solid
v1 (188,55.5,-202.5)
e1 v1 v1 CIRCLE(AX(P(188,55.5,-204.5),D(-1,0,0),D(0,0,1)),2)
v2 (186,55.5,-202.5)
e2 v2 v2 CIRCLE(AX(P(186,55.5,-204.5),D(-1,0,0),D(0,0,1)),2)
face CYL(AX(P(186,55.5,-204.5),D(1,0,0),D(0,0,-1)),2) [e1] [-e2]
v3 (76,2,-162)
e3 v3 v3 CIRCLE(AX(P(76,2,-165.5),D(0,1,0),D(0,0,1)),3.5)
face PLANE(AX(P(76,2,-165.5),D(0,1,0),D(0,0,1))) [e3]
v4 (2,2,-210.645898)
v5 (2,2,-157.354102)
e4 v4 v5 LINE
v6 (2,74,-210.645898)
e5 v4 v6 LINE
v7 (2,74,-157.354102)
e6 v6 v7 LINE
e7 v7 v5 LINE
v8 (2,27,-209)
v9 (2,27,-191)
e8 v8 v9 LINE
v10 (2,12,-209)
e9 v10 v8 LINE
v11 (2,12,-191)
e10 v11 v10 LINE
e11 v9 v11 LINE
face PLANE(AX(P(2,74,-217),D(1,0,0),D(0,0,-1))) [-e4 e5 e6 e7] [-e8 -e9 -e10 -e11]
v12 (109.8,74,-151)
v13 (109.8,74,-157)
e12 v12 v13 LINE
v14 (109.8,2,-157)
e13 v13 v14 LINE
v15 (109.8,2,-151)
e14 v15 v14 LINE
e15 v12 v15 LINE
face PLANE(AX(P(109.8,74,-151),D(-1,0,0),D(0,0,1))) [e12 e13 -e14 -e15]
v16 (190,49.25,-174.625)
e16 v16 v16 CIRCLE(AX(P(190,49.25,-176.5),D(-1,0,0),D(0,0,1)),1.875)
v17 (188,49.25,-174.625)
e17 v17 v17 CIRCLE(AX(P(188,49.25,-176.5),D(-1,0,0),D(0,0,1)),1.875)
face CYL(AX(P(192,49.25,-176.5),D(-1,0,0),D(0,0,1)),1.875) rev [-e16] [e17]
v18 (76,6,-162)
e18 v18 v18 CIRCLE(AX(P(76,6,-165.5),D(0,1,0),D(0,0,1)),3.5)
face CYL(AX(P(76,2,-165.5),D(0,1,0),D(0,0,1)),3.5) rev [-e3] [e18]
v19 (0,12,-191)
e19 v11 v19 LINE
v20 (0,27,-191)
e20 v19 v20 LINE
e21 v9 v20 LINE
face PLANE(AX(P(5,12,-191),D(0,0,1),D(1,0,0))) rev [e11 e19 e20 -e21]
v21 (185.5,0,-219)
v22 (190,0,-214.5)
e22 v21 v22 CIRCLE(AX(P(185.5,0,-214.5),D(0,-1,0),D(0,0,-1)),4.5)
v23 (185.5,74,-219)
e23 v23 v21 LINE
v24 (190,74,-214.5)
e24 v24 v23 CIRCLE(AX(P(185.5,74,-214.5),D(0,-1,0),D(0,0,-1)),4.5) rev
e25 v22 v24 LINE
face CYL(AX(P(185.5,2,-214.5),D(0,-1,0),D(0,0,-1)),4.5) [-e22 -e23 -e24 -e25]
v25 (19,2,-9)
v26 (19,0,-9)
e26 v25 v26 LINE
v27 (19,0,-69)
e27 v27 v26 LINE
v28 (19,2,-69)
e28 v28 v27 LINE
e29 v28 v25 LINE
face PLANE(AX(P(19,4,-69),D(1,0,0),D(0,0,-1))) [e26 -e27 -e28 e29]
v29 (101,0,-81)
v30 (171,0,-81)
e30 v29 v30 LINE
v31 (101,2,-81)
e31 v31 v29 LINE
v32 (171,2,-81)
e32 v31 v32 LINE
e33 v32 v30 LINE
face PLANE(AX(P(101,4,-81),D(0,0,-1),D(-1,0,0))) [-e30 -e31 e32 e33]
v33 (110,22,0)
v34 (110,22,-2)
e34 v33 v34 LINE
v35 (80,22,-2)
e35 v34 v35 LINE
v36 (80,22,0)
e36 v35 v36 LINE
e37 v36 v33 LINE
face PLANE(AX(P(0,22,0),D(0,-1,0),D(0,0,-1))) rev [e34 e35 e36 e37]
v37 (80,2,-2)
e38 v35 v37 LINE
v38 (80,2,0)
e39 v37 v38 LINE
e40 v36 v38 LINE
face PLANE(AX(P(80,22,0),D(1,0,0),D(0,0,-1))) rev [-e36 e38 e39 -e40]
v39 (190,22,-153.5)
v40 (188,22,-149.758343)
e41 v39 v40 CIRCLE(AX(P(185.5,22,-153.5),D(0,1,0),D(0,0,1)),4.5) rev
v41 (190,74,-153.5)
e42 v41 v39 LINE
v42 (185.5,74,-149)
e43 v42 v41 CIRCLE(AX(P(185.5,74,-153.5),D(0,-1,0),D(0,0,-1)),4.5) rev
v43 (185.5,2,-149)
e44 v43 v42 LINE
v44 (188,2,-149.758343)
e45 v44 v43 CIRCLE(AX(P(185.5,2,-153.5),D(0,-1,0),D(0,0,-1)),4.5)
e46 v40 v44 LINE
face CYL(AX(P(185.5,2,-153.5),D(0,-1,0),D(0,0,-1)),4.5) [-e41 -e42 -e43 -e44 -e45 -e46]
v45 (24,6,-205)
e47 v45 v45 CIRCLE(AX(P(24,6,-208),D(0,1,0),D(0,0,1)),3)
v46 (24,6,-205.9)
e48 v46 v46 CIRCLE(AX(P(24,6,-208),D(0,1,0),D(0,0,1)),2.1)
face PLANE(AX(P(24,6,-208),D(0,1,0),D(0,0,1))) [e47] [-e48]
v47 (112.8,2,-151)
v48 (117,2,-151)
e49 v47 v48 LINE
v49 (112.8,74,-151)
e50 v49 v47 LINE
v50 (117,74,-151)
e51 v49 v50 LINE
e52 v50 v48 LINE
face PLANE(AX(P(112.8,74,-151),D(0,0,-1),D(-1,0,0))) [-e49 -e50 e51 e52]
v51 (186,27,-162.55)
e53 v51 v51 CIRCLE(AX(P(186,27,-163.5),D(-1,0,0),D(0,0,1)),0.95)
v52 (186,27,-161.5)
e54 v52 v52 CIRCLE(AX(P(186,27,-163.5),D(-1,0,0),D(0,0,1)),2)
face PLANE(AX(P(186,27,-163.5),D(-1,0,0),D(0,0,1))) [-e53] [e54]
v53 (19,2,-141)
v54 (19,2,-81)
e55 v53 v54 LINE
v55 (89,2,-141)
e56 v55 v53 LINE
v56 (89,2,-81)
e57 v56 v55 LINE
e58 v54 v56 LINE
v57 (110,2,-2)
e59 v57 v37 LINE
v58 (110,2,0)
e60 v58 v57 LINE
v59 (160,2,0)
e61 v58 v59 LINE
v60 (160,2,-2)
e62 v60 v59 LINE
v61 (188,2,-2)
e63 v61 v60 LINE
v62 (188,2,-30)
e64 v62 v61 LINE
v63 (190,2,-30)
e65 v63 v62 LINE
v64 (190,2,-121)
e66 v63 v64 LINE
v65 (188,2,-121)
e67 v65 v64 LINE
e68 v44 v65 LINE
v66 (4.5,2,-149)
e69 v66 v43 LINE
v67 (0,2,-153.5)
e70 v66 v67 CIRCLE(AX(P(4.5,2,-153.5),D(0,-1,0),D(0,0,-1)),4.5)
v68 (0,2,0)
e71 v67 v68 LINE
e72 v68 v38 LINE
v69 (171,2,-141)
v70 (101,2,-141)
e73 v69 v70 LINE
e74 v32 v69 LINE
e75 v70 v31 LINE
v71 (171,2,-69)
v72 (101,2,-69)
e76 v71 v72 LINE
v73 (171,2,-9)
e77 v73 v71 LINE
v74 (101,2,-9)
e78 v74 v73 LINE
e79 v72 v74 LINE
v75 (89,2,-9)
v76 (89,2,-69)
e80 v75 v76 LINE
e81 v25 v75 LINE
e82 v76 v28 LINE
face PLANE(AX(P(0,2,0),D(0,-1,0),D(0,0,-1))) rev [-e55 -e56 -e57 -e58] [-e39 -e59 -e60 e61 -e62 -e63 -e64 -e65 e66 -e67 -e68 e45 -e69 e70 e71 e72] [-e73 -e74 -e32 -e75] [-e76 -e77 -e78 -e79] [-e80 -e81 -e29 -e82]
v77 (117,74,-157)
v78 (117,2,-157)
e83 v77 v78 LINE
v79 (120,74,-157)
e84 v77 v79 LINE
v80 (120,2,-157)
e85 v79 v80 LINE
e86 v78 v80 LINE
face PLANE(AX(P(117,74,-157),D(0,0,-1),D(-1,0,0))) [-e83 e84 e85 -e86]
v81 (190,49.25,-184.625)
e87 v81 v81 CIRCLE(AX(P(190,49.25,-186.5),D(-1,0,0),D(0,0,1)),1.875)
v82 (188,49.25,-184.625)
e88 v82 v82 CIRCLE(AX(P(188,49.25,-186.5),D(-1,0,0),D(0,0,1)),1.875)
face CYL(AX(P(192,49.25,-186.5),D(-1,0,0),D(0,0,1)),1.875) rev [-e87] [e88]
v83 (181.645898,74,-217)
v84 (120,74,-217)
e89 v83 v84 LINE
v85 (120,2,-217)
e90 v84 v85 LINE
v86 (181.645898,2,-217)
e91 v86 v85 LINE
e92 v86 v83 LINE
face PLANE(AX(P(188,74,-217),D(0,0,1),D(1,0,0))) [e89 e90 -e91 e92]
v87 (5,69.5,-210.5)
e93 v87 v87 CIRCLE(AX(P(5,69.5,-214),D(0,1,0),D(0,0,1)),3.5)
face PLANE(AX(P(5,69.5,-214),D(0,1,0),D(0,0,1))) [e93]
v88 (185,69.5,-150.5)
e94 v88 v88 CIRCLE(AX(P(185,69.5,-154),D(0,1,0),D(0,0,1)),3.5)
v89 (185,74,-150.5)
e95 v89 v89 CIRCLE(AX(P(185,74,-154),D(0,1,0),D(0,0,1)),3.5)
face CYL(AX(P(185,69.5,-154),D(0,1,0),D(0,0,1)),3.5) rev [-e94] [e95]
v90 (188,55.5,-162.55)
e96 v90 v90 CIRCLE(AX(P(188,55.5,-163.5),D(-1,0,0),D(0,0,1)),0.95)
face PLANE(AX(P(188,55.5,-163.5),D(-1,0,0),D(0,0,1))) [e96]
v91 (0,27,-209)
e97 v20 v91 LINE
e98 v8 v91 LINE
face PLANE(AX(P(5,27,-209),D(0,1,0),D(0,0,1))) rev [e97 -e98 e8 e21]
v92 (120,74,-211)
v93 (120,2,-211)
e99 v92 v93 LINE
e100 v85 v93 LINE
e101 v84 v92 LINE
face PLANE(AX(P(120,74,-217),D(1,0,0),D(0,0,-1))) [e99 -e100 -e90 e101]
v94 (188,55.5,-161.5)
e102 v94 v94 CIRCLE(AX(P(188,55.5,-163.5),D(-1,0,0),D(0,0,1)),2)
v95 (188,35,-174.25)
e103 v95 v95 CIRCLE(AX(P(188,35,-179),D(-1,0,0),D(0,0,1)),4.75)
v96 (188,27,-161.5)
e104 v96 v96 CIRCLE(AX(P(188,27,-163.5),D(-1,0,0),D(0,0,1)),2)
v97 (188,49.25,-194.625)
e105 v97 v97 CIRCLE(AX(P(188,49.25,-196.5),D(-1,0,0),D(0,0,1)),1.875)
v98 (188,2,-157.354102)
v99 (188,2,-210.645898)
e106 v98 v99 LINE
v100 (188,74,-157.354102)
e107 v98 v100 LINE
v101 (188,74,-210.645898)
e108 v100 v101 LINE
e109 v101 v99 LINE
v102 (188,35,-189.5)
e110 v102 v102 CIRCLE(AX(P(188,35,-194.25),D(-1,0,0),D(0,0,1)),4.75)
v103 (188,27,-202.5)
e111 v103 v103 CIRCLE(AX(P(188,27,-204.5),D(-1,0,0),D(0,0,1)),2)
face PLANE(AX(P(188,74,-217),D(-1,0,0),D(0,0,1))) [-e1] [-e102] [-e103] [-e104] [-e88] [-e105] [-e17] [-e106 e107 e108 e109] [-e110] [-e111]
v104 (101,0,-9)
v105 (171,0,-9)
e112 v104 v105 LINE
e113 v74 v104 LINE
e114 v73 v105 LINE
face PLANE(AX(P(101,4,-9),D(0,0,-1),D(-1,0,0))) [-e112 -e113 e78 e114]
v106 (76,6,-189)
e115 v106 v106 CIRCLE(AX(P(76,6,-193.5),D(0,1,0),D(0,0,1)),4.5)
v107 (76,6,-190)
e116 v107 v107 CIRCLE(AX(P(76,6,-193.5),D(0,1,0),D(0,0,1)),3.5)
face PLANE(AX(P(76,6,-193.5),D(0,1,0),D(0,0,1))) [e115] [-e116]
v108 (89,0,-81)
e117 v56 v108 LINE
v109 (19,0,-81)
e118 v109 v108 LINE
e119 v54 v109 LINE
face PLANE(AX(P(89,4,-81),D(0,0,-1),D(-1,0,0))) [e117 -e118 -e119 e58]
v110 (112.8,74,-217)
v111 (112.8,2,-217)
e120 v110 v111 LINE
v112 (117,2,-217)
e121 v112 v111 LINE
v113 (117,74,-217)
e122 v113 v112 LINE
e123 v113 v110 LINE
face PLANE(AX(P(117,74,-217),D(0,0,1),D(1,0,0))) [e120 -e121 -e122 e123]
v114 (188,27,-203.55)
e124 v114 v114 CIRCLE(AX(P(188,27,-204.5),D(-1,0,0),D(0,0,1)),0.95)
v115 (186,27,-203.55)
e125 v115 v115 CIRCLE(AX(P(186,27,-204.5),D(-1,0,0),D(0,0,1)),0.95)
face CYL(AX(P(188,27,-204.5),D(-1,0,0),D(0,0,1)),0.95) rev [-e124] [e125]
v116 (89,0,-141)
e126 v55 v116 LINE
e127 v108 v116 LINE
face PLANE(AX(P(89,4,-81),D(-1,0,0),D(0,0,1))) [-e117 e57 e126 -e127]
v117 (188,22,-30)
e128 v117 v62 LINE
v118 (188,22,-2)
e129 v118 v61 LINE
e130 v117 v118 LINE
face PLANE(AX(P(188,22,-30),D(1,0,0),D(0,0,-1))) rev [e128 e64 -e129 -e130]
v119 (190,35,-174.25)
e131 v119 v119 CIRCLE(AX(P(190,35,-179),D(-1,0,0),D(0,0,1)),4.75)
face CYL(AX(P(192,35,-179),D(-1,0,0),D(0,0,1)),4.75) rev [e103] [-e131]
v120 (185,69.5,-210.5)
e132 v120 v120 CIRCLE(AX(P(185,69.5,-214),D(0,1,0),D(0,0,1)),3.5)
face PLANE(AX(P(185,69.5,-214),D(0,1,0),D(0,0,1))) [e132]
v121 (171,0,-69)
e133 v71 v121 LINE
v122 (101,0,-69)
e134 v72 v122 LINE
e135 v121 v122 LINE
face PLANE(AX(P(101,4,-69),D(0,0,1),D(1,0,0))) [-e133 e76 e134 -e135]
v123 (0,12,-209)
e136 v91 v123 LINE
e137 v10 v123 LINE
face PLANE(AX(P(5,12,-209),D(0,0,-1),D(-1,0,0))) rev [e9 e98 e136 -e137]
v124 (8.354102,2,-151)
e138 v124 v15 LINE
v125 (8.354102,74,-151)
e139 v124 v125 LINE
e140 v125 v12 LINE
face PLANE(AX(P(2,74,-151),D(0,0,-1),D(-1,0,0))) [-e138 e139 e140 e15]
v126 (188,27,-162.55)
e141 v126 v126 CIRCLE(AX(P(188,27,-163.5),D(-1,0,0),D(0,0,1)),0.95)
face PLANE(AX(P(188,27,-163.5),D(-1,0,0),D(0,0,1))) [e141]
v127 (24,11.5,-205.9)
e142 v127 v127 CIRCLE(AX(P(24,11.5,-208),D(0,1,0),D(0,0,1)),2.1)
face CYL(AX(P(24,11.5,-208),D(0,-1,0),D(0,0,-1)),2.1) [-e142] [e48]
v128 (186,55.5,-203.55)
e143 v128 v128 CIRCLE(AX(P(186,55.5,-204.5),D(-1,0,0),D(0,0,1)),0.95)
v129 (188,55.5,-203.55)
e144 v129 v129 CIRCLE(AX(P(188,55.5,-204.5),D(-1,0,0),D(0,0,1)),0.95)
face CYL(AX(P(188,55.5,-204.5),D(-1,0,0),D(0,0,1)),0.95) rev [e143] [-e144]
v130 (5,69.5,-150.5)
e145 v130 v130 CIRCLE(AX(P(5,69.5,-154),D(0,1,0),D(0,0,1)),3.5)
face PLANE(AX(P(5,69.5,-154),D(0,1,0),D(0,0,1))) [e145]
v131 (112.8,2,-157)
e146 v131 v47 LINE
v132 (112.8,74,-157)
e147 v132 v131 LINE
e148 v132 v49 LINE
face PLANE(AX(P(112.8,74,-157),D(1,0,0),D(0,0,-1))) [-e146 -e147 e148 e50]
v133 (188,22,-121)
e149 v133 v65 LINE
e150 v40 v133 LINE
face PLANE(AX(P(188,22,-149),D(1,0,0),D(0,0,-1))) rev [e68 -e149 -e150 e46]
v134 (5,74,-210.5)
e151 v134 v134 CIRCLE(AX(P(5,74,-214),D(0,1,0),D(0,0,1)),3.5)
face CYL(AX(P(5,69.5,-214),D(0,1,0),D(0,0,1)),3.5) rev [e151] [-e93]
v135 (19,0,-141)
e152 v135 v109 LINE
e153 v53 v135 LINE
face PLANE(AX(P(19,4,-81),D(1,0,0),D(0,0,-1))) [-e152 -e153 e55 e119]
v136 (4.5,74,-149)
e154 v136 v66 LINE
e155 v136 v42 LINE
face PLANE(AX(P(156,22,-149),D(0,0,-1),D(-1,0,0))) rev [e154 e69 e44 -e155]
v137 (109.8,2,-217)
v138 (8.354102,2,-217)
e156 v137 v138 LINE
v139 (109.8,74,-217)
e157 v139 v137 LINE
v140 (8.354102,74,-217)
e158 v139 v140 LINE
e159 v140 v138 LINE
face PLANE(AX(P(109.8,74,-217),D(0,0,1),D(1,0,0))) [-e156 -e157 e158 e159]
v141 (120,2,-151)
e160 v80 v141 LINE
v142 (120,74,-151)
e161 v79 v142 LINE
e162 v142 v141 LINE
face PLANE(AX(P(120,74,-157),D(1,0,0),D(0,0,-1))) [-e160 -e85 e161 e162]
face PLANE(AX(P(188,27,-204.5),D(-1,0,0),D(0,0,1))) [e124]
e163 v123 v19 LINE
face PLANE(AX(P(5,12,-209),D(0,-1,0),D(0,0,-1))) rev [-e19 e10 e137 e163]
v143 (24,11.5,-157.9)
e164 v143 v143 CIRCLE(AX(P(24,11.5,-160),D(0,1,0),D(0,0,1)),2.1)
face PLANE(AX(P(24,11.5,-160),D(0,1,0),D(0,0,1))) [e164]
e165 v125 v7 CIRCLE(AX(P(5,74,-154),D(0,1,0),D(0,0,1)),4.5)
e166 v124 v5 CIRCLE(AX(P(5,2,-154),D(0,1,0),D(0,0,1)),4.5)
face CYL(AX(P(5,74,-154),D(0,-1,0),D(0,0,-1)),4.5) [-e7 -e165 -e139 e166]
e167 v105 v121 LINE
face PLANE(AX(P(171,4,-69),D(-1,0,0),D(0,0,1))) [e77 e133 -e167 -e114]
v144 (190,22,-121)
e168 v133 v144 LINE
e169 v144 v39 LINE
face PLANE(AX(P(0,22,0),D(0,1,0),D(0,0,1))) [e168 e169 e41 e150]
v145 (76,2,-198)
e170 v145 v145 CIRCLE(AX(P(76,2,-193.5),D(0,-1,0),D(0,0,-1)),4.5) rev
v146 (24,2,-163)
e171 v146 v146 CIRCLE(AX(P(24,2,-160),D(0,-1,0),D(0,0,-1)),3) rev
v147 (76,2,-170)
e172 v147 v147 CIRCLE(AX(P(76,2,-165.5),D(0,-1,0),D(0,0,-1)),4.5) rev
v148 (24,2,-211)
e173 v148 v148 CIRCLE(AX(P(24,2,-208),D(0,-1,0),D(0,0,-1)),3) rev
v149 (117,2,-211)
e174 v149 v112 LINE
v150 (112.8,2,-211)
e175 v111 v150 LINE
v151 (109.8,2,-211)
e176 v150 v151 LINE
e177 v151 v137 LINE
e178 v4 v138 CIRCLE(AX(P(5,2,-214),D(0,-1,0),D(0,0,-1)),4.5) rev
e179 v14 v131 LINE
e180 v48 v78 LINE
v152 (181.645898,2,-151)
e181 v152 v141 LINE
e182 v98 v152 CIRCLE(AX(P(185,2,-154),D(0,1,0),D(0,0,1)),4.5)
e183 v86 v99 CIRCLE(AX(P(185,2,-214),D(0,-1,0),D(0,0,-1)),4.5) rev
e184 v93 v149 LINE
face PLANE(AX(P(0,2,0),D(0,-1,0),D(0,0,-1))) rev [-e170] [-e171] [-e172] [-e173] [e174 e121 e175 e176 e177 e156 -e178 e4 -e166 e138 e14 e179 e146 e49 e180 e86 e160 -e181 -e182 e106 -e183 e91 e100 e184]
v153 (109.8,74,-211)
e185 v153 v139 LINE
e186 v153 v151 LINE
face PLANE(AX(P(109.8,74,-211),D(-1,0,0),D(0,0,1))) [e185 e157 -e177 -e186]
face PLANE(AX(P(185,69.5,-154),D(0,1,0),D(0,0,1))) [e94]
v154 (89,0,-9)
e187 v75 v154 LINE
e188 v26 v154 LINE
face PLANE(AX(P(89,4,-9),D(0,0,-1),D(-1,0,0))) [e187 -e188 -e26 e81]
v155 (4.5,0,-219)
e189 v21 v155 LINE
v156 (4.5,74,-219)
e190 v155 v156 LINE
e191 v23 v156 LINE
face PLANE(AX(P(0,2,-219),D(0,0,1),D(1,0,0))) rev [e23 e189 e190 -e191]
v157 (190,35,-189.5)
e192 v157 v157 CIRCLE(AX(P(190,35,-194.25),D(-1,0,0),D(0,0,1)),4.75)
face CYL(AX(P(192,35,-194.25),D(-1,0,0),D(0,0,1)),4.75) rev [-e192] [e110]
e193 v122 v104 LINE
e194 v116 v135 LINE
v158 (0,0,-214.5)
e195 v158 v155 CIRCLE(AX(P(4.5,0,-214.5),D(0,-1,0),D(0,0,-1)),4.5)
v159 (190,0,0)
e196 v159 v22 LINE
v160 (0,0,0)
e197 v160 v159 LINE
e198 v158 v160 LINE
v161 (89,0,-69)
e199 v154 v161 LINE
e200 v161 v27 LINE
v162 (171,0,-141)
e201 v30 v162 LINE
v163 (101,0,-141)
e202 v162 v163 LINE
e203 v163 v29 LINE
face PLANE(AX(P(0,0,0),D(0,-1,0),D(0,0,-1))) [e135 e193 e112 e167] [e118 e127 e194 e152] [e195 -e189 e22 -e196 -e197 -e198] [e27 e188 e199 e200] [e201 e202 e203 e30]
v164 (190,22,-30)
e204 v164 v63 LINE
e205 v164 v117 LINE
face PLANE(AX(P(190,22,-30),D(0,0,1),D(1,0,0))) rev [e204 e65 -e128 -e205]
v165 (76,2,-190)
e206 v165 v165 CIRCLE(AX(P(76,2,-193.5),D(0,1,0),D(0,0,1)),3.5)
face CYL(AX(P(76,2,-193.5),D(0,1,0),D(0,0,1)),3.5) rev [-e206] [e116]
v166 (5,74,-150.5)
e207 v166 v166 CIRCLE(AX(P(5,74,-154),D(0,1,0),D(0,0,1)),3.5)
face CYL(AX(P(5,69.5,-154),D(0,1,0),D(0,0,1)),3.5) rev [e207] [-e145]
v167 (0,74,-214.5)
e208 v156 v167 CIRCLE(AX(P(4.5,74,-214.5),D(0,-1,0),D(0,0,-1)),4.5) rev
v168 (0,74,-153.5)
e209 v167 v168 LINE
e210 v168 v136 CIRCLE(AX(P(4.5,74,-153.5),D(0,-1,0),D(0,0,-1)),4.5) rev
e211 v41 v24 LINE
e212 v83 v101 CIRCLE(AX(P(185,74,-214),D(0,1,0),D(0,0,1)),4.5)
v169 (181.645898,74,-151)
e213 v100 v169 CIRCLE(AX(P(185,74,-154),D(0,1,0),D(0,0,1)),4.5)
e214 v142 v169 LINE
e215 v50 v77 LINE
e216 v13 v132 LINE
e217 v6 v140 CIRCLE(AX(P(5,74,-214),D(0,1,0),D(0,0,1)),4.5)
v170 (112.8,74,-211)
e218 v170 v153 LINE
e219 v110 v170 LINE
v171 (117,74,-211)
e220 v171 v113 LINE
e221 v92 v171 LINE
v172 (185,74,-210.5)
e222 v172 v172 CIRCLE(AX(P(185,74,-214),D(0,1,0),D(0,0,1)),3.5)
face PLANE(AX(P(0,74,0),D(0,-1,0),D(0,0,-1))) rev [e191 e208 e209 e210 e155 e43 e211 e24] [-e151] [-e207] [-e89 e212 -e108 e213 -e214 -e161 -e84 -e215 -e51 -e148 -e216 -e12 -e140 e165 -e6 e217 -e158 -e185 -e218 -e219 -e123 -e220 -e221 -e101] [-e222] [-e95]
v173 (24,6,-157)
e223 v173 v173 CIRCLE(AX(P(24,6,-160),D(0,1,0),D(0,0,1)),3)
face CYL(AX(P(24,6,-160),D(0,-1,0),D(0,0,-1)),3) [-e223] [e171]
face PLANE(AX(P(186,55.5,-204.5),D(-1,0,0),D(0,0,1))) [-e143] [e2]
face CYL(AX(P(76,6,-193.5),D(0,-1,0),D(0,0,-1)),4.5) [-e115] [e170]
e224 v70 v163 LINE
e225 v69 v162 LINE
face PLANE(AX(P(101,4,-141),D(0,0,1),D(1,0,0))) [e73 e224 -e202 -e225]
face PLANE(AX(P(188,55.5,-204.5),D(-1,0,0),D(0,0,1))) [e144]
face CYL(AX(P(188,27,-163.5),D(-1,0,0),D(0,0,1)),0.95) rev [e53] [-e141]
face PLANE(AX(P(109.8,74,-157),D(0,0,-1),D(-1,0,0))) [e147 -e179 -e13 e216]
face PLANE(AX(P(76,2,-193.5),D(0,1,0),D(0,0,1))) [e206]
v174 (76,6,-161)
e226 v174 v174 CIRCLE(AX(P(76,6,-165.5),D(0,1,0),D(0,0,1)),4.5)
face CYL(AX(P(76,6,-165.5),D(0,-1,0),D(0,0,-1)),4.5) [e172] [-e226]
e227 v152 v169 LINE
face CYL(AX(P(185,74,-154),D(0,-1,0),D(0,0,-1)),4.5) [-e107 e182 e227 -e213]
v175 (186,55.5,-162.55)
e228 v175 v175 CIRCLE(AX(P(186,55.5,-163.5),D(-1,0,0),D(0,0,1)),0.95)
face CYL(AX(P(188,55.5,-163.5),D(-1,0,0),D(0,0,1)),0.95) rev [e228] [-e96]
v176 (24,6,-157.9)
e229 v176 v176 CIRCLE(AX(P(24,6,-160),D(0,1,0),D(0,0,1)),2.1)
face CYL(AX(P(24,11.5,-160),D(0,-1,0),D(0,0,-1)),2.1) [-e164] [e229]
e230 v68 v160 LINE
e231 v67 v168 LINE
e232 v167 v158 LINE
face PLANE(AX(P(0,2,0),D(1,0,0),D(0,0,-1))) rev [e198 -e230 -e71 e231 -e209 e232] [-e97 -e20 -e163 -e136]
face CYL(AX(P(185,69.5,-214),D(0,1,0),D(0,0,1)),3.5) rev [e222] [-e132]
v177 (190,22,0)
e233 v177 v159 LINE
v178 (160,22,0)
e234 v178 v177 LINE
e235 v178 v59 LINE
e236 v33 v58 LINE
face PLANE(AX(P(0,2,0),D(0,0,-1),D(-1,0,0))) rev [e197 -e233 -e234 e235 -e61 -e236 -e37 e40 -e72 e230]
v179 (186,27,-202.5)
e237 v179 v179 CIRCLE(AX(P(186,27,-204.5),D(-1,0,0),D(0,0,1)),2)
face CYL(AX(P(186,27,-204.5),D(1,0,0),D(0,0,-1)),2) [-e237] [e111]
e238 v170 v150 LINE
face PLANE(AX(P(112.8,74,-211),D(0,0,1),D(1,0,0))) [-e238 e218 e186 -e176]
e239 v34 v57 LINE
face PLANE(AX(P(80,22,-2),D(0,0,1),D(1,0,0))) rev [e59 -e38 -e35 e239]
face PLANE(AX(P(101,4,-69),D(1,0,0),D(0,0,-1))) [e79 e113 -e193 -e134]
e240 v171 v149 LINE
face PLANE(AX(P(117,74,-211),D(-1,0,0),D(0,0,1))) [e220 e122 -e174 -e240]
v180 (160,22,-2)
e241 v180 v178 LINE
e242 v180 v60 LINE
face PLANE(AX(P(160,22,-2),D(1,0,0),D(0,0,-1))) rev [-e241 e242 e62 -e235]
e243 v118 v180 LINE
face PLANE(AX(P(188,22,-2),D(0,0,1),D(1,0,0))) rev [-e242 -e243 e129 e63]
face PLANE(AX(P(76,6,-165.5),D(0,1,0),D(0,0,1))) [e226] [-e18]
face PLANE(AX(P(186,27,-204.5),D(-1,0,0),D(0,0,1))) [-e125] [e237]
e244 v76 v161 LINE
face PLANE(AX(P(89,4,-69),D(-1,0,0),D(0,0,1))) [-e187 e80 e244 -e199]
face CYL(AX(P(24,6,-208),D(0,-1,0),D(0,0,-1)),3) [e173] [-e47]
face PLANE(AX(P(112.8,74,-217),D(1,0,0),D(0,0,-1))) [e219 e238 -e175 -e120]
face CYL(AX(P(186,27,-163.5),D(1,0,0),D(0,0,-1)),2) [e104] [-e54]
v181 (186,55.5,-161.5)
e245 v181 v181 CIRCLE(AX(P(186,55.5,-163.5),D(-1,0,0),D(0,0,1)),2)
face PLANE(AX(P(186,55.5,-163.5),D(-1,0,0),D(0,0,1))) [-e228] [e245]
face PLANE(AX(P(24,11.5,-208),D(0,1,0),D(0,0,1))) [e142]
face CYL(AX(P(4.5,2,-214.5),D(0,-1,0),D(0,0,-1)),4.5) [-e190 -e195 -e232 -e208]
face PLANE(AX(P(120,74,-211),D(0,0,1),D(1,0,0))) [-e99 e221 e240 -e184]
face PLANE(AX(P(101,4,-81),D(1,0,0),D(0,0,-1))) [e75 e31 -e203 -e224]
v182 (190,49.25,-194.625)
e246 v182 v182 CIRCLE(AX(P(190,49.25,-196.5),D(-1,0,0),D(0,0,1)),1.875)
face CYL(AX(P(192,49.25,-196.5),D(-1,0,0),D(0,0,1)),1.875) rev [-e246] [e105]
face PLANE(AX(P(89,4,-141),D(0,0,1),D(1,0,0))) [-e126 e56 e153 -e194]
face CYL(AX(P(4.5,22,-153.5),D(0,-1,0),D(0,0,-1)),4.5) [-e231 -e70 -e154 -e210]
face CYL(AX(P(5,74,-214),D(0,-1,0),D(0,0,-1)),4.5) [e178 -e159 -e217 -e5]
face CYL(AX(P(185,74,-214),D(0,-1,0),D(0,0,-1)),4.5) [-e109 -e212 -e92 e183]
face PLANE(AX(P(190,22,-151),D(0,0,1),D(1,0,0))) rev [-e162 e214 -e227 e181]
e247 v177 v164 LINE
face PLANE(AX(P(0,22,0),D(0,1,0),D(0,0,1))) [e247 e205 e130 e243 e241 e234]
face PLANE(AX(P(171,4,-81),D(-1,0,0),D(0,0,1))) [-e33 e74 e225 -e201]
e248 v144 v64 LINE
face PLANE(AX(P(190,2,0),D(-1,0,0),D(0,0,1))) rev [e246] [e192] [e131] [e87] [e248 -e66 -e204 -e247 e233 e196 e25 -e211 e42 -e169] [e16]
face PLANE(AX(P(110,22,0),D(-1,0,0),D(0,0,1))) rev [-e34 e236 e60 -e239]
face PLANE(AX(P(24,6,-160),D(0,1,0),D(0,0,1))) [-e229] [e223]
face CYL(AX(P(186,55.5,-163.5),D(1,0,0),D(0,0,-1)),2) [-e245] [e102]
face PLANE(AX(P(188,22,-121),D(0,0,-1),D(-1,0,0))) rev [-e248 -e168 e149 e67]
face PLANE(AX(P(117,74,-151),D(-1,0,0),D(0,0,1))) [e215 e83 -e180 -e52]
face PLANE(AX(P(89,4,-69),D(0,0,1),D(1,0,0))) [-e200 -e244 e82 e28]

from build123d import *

# Parameters (mm, degrees)
SKETCH1_W           = 190
SKETCH1_H           = 219
BOSS_EXTRUDE1_DEPTH = 2
SKETCH4_W           = 70
SKETCH4_H           = 60
CUT_EXTRUDE1_DEPTH  = 4
SKETCH2_W           = 30
SKETCH2_H           = 2
BOSS_EXTRUDE2_DEPTH = 20
SKETCH3_W           = 190
SKETCH3_H           = 70
BOSS_EXTRUDE3_DEPTH = 72
SKETCH7_R           = 3
SKETCH7_R_2         = 4.5
BOSS_EXTRUDE4_DEPTH = 4
SKETCH8_R           = 3.5
CUT_EXTRUDE3_DEPTH  = 4
SKETCH9_R           = 2
BOSS_EXTRUDE5_DEPTH = 2
SKETCH10_R          = 0.95
CUT_EXTRUDE4_DEPTH  = 2
SKETCH11_R          = 1.875
SKETCH11_R_2        = 4.75
CUT_EXTRUDE5_DEPTH  = 4
SKETCH12_R          = 4.5
BOSS_EXTRUDE6_DEPTH = 72
SKETCH13_R          = 3.5
CUT_EXTRUDE6_DEPTH  = 4.5
FILLET1_START       = 2
FILLET1_DEPTH       = 73
FILLET1_START_2     = 22
FILLET1_2_DEPTH     = 53
FILLET1_START_3     = -1
FILLET1_3_DEPTH     = 23
SKETCH14_W          = 18
SKETCH14_H          = 15
CUT_EXTRUDE7_DEPTH  = 5
SKETCH15_R          = 2.1
BOSS_EXTRUDE7_DEPTH = 5.5


with BuildPart() as part:
    # Sketch1 → Boss-Extrude1 (new body)
    with BuildSketch(Plane(origin=(0, 0, 0), x_dir=(1, 0, 0), z_dir=(0, 1, 0))):
        with Locations((95, 109.5)):
            Rectangle(SKETCH1_W, SKETCH1_H)
    extrude(amount=BOSS_EXTRUDE1_DEPTH)

    # Sketch4 → Cut-Extrude1 (cut)
    with BuildSketch(Plane(origin=(0, 0, 0), x_dir=(1, 0, 0), z_dir=(0, 1, 0))):
        with Locations((54, 111)):
            Rectangle(SKETCH4_W, SKETCH4_H)
        with Locations((136, 111)):
            Rectangle(SKETCH4_W, SKETCH4_H)
        with Locations((136, 39)):
            Rectangle(SKETCH4_W, SKETCH4_H)
        with Locations((54, 39)):
            Rectangle(SKETCH4_W, SKETCH4_H)
    extrude(amount=CUT_EXTRUDE1_DEPTH, mode=Mode.SUBTRACT)

    # Sketch2 → Boss-Extrude2 (add)
    with BuildSketch(Plane(origin=(0, 2, 0), x_dir=(1, 0, 0), z_dir=(0, 1, 0))):
        with Locations((95, 1)):
            Rectangle(SKETCH2_W, SKETCH2_H)
        Polygon((160, 0), (190, 0), (190, 30), (188, 30), (188, 2), (160, 2), align=None)
        Polygon((190, 121), (190, 151), (156, 151), (156, 149), (188, 149), (188, 121), align=None)
    extrude(amount=BOSS_EXTRUDE2_DEPTH)

    # Sketch3 → Boss-Extrude3 (add)
    with BuildSketch(Plane(origin=(0, 2, 0), x_dir=(1, 0, 0), z_dir=(0, 1, 0))):
        with Locations((95, 184)):
            Rectangle(SKETCH3_W, SKETCH3_H)
        Polygon((188, 217), (120, 217), (120, 211), (117, 211), (117, 217), (112.8, 217), (112.8, 211), (109.8, 211), (109.8, 217), (2, 217), (2, 151), (109.8, 151), (109.8, 157), (112.8, 157), (112.8, 151), (117, 151), (117, 157), (120, 157), (120, 151), (188, 151), align=None, mode=Mode.SUBTRACT)
    extrude(amount=BOSS_EXTRUDE3_DEPTH)

    # Sketch7 → Boss-Extrude4 (add)
    with BuildSketch(Plane(origin=(0, 2, 0), x_dir=(1, 0, 0), z_dir=(0, 1, 0))):
        with Locations(Location((24, 208, 0), (0, 0, 90))):
            Circle(SKETCH7_R)
        with Locations(Location((24, 160, 0), (0, 0, 90))):
            Circle(SKETCH7_R)
        with Locations(Location((76, 193.5, 0), (0, 0, 90))):
            Circle(SKETCH7_R_2)
        with Locations(Location((76, 165.5, 0), (0, 0, 90))):
            Circle(SKETCH7_R_2)
    extrude(amount=BOSS_EXTRUDE4_DEPTH)

    # Sketch8 → Cut-Extrude3 (cut)
    with BuildSketch(Plane(origin=(0, 6, 0), x_dir=(1, 0, 0), z_dir=(0, 1, 0))):
        with Locations(Location((76, 193.5, 0), (0, 0, 270))):
            Circle(SKETCH8_R)
        with Locations(Location((76, 165.5, 0), (0, 0, 270))):
            Circle(SKETCH8_R)
    extrude(amount=-CUT_EXTRUDE3_DEPTH, mode=Mode.SUBTRACT)

    # Sketch9 → Boss-Extrude5 (add)
    with BuildSketch(Plane.ZY.offset(-188)):
        with Locations((-204.5, 55.5)):
            Circle(SKETCH9_R)
        with Locations((-163.5, 55.5)):
            Circle(SKETCH9_R)
        with Locations((-204.5, 27)):
            Circle(SKETCH9_R)
        with Locations((-163.5, 27)):
            Circle(SKETCH9_R)
    extrude(amount=BOSS_EXTRUDE5_DEPTH)

    # Sketch10 → Cut-Extrude4 (cut)
    with BuildSketch(Plane.ZY.offset(-186)):
        with Locations((-204.5, 55.5)):
            Circle(SKETCH10_R)
        with Locations((-163.5, 55.5)):
            Circle(SKETCH10_R)
        with Locations((-163.5, 27)):
            Circle(SKETCH10_R)
        with Locations((-204.5, 27)):
            Circle(SKETCH10_R)
    extrude(amount=-CUT_EXTRUDE4_DEPTH, mode=Mode.SUBTRACT)

    # Sketch11 → Cut-Extrude5 (cut)
    with BuildSketch(Plane.ZY.offset(-188)):
        with Locations((-196.5, 49.25)):
            Circle(SKETCH11_R)
        with Locations((-186.5, 49.25)):
            Circle(SKETCH11_R)
        with Locations((-176.5, 49.25)):
            Circle(SKETCH11_R)
        with Locations((-194.25, 35)):
            Circle(SKETCH11_R_2)
        with Locations((-179, 35)):
            Circle(SKETCH11_R_2)
    extrude(amount=-CUT_EXTRUDE5_DEPTH, mode=Mode.SUBTRACT)

    # Sketch12 → Boss-Extrude6 (add)
    with BuildSketch(Plane(origin=(0, 2, 0), x_dir=(1, 0, 0), z_dir=(0, 1, 0))):
        with Locations((5, 214)):
            Circle(SKETCH12_R)
        with Locations((5, 154)):
            Circle(SKETCH12_R)
        with Locations((185, 214)):
            Circle(SKETCH12_R)
        with Locations((185, 154)):
            Circle(SKETCH12_R)
    extrude(amount=BOSS_EXTRUDE6_DEPTH)

    # Sketch13 → Cut-Extrude6 (cut)
    with BuildSketch(Plane(origin=(0, 74, 0), x_dir=(1, 0, 0), z_dir=(0, 1, 0))):
        with Locations(Location((5, 214, 0), (0, 0, 270))):
            Circle(SKETCH13_R)
        with Locations(Location((5, 154, 0), (0, 0, 270))):
            Circle(SKETCH13_R)
        with Locations(Location((185, 214, 0), (0, 0, 270))):
            Circle(SKETCH13_R)
        with Locations(Location((185, 154, 0), (0, 0, 270))):
            Circle(SKETCH13_R)
    extrude(amount=-CUT_EXTRUDE6_DEPTH, mode=Mode.SUBTRACT)

    # Fillet1: read off the stored shape, not the designer's step
    # Fillet1 outline → Fillet1 (cut)
    with BuildSketch(Plane(origin=(0, 0, 0), x_dir=(1, 0, 0), z_dir=(0, 1, 0)).offset(FILLET1_START)):
        with BuildLine():
            Line((0, 149), (4.5, 149))
            ThreePointArc((4.5, 149), (1.318019485, 150.318019485), (0, 153.5))
            Line((0, 153.5), (0, 149))
        make_face()
        with BuildLine():
            ThreePointArc((188, 149.758342614), (186.80624304, 149.19375696), (185.5, 149))
            Line((185.5, 149), (188, 149))
            Line((188, 149), (188, 149.758342614))
        make_face()
        with BuildLine():
            Line((0, 219), (0, 214.5))
            ThreePointArc((0, 214.5), (1.318019485, 217.681980515), (4.5, 219))
            Line((4.5, 219), (0, 219))
        make_face()
        with BuildLine():
            Line((190, 219), (185.5, 219))
            ThreePointArc((185.5, 219), (188.681980515, 217.681980515), (190, 214.5))
            Line((190, 214.5), (190, 219))
        make_face()
    extrude(amount=FILLET1_DEPTH, mode=Mode.SUBTRACT)

    # Fillet1 2 outline → Fillet1 2 (cut)
    with BuildSketch(Plane(origin=(0, 0, 0), x_dir=(1, 0, 0), z_dir=(0, 1, 0)).offset(FILLET1_START_2)):
        with BuildLine():
            ThreePointArc((190, 153.5), (189.468626966, 151.378679657), (188, 149.758342614))
            Line((188, 149.758342614), (188, 149))
            Line((188, 149), (190, 149))
            Line((190, 149), (190, 153.5))
        make_face()
    extrude(amount=FILLET1_2_DEPTH, mode=Mode.SUBTRACT)

    # Fillet1 3 outline → Fillet1 3 (cut)
    with BuildSketch(Plane(origin=(0, 0, 0), x_dir=(1, 0, 0), z_dir=(0, 1, 0)).offset(FILLET1_START_3)):
        with BuildLine():
            Line((0, 219), (0, 214.5))
            ThreePointArc((0, 214.5), (1.318019485, 217.681980515), (4.5, 219))
            Line((4.5, 219), (0, 219))
        make_face()
        with BuildLine():
            Line((190, 219), (185.5, 219))
            ThreePointArc((185.5, 219), (188.681980515, 217.681980515), (190, 214.5))
            Line((190, 214.5), (190, 219))
        make_face()
    extrude(amount=FILLET1_3_DEPTH, mode=Mode.SUBTRACT)

    # Sketch14 → Cut-Extrude7 (cut)
    with BuildSketch(Plane.ZY):
        with Locations((-200, 19.5)):
            Rectangle(SKETCH14_W, SKETCH14_H)
    extrude(amount=-CUT_EXTRUDE7_DEPTH, mode=Mode.SUBTRACT)

    # Sketch15 → Boss-Extrude7 (add)
    with BuildSketch(Plane(origin=(0, 6, 0), x_dir=(1, 0, 0), z_dir=(0, 1, 0))):
        with Locations(Location((24, 208, 0), (0, 0, 270))):
            Circle(SKETCH15_R)
        with Locations(Location((24, 160, 0), (0, 0, 270))):
            Circle(SKETCH15_R)
    extrude(amount=BOSS_EXTRUDE7_DEPTH)


solid = part.part
